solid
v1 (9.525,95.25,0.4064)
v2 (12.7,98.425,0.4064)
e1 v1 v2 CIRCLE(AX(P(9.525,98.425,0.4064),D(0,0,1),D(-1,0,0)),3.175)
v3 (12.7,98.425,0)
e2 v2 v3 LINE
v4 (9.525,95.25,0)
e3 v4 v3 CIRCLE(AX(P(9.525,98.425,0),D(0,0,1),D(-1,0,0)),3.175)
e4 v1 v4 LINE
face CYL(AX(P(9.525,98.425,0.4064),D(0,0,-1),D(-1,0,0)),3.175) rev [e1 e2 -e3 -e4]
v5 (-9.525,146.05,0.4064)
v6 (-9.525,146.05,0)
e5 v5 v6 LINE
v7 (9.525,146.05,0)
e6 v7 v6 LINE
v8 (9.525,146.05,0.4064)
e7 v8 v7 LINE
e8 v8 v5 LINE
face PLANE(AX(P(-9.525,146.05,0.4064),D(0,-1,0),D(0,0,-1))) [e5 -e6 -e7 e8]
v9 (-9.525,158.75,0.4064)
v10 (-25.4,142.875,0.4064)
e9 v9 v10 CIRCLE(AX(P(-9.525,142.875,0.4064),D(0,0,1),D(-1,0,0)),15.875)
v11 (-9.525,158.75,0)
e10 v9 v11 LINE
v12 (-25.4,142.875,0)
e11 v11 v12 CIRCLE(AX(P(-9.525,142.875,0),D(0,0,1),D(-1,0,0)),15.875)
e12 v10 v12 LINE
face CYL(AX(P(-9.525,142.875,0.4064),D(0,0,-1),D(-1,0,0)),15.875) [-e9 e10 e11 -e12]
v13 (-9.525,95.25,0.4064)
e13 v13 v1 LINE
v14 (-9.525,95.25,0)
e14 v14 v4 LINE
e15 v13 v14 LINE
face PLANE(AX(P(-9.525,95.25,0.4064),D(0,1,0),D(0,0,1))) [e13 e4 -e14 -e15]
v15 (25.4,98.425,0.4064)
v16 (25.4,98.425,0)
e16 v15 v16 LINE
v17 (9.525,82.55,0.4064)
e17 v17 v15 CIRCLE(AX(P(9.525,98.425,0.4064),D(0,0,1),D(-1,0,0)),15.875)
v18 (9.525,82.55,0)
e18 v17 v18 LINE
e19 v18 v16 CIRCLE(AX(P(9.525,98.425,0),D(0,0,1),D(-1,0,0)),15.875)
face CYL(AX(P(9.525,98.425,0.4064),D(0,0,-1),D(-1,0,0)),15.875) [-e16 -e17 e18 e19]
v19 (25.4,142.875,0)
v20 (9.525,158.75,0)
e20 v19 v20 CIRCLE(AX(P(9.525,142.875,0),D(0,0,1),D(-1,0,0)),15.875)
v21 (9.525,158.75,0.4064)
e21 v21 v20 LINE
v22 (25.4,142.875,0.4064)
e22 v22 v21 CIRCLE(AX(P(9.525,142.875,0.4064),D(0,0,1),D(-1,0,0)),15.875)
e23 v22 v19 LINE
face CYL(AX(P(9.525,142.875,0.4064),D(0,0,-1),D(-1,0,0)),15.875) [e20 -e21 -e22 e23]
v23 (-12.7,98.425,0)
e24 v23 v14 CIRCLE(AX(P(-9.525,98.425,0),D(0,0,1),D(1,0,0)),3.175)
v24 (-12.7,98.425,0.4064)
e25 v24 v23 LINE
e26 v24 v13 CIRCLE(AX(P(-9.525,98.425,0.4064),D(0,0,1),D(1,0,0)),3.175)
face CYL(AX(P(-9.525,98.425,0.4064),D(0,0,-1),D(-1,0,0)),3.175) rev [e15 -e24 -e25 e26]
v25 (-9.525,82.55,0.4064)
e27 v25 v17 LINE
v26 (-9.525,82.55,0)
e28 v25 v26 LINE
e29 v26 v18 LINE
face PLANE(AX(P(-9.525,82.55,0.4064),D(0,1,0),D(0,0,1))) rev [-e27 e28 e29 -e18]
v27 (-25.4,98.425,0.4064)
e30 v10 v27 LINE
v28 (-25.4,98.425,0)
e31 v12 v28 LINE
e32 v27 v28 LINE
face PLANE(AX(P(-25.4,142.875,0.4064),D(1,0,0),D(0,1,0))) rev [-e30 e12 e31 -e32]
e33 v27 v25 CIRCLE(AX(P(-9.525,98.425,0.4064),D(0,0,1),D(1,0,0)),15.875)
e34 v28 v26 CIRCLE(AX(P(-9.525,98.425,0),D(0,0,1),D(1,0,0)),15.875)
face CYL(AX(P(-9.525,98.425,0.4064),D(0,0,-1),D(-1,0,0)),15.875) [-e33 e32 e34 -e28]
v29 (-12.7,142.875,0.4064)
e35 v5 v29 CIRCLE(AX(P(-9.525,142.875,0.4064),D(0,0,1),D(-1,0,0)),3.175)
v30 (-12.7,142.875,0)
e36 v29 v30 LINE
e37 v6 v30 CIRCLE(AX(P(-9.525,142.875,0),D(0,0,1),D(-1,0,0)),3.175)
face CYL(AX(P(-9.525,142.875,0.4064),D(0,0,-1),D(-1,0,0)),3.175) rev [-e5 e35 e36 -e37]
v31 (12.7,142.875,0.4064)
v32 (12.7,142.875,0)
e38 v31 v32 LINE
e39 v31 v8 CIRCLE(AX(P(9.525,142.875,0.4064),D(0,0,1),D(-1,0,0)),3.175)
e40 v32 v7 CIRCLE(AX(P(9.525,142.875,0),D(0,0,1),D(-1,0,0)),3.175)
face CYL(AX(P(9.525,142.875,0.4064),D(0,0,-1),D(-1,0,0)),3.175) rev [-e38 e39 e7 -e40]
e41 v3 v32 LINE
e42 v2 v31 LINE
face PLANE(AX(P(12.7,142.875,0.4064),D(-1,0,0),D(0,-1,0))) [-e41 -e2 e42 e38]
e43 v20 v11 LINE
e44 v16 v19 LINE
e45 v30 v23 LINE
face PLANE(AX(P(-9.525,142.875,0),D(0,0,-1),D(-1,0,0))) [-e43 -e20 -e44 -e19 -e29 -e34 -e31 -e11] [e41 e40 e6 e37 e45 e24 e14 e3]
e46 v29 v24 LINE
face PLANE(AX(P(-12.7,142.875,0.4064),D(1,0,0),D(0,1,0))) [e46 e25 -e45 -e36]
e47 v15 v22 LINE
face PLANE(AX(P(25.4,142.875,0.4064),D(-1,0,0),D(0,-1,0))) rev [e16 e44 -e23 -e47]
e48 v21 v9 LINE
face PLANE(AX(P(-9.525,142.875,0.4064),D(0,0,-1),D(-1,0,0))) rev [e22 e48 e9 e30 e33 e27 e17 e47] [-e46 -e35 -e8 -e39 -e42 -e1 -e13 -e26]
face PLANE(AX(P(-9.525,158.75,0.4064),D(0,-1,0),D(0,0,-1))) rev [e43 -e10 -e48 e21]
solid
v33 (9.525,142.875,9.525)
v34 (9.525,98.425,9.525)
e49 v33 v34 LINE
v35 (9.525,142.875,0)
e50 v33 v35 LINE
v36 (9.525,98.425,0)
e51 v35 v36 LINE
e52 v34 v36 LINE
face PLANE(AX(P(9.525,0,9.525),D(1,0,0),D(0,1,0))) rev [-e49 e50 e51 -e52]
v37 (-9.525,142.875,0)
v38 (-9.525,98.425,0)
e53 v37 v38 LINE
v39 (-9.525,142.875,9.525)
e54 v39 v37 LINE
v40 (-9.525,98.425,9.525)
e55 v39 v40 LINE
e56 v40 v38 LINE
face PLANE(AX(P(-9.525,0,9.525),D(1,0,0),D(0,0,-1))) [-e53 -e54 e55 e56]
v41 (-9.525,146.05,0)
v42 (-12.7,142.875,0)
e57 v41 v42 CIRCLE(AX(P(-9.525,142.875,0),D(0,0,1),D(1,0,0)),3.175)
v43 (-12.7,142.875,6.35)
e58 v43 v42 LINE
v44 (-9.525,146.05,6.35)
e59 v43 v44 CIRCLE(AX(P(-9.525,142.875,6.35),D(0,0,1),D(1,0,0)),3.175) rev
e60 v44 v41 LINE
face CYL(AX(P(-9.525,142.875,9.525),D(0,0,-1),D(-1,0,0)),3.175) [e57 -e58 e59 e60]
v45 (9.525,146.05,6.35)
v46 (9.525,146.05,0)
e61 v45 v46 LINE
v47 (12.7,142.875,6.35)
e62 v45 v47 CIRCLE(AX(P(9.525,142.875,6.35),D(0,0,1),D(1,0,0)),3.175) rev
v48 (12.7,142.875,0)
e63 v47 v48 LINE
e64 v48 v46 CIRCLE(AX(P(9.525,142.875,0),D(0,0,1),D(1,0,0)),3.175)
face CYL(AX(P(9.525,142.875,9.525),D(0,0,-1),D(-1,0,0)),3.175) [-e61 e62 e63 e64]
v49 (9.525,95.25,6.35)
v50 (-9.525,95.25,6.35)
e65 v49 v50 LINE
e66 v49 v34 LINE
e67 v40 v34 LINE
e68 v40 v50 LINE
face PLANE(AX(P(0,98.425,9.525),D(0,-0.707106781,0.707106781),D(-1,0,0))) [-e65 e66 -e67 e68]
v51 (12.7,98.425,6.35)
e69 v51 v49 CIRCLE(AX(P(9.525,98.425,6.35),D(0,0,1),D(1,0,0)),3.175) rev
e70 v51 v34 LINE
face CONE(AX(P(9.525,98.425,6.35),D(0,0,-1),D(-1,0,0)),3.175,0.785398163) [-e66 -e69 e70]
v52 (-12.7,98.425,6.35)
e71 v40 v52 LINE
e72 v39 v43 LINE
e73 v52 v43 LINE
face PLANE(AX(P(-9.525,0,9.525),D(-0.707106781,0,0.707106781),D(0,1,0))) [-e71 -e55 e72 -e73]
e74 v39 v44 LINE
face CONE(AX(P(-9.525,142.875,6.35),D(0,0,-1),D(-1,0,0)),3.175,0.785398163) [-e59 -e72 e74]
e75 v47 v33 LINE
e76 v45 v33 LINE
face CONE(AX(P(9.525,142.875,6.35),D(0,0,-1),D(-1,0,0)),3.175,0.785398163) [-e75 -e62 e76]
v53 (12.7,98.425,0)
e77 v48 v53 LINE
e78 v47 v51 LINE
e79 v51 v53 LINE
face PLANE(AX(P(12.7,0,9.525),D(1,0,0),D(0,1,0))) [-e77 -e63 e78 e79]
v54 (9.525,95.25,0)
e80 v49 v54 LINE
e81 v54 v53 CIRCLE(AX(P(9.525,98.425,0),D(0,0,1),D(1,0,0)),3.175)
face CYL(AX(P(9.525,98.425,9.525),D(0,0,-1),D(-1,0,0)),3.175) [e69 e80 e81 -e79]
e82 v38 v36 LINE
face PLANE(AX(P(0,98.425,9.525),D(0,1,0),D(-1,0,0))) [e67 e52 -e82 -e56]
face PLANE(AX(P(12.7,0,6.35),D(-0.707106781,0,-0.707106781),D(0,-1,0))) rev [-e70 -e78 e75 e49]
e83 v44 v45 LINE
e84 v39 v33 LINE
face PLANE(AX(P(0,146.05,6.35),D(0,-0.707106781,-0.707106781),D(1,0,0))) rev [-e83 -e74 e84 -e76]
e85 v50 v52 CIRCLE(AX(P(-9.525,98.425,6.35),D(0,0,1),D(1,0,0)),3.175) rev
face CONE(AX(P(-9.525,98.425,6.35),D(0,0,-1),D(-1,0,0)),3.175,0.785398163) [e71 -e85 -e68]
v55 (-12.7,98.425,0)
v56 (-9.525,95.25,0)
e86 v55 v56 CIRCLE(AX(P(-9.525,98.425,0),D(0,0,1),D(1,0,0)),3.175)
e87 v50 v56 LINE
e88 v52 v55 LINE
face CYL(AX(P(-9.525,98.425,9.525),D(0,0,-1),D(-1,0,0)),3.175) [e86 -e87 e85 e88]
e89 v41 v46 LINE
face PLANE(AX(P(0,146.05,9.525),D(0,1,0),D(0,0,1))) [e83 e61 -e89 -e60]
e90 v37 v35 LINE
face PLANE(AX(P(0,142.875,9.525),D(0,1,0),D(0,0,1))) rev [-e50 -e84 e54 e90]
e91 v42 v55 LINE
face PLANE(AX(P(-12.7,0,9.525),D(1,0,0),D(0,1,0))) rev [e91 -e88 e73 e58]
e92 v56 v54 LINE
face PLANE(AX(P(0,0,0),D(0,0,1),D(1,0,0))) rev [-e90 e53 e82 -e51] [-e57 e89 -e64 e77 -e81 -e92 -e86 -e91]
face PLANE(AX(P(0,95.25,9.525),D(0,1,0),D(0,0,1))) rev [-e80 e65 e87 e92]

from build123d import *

# Parameters (mm, degrees)
BOSS_EXTRUDE1_DEPTH = 0.4064
SKETCH3_W           = 19.05
SKETCH3_H           = 44.45
BOSS_EXTRUDE5_DEPTH = 9.525
CHAMFER1_SIZE       = 3.175


with BuildPart() as part:
    # Sketch2 → Boss-Extrude1 (new body)
    with BuildSketch(Plane.XY):
        with BuildLine():
            Line((-9.525, 158.75), (9.525, 158.75))
            ThreePointArc((9.525, 158.75), (20.750320151, 154.100320151), (25.4, 142.875))
            Line((25.4, 142.875), (25.4, 98.425))
            ThreePointArc((25.4, 98.425), (20.750320151, 87.199679849), (9.525, 82.55))
            Line((9.525, 82.55), (-9.525, 82.55))
            ThreePointArc((-9.525, 82.55), (-20.750320151, 87.199679849), (-25.4, 98.425))
            Line((-25.4, 98.425), (-25.4, 142.875))
            ThreePointArc((-25.4, 142.875), (-20.750320151, 154.100320151), (-9.525, 158.75))
        make_face()
        with BuildLine():
            Line((-9.525, 95.25), (9.525, 95.25))
            ThreePointArc((9.525, 95.25), (11.77006403, 96.17993597), (12.7, 98.425))
            Line((12.7, 98.425), (12.7, 142.875))
            ThreePointArc((12.7, 142.875), (11.77006403, 145.12006403), (9.525, 146.05))
            Line((9.525, 146.05), (-9.525, 146.05))
            ThreePointArc((-9.525, 146.05), (-11.77006403, 145.12006403), (-12.7, 142.875))
            Line((-12.7, 142.875), (-12.7, 98.425))
            ThreePointArc((-12.7, 98.425), (-11.77006403, 96.17993597), (-9.525, 95.25))
        make_face(mode=Mode.SUBTRACT)
    extrude(amount=BOSS_EXTRUDE1_DEPTH)


with BuildPart() as body_2:
    # Sketch3 → Boss-Extrude5 (new body)
    with BuildSketch(Plane.XY):
        with BuildLine():
            Line((-9.525, 95.25), (9.525, 95.25))
            ThreePointArc((9.525, 95.25), (11.77006403, 96.17993597), (12.7, 98.425))
            Line((12.7, 98.425), (12.7, 142.875))
            ThreePointArc((12.7, 142.875), (11.77006403, 145.12006403), (9.525, 146.05))
            Line((9.525, 146.05), (-9.525, 146.05))
            ThreePointArc((-9.525, 146.05), (-11.77006403, 145.12006403), (-12.7, 142.875))
            Line((-12.7, 142.875), (-12.7, 98.425))
            ThreePointArc((-12.7, 98.425), (-11.77006403, 96.17993597), (-9.525, 95.25))
        make_face()
        with Locations((0, 120.65)):
            Rectangle(SKETCH3_W, SKETCH3_H, mode=Mode.SUBTRACT)
    extrude(amount=BOSS_EXTRUDE5_DEPTH)

    # Chamfer1
    chamfer1_edges = [body_2.edges().sort_by_distance(p)[0] for p in [
        (0, 146.05, 9.525),
        (-11.77006403, 145.12006403, 9.525),
        (-12.7, 120.65, 9.525),
        (-11.77006403, 96.17993597, 9.525),
        (0, 95.25, 9.525),
        (11.77006403, 96.17993597, 9.525),
        (12.7, 120.65, 9.525),
        (11.77006403, 145.12006403, 9.525),
    ]]
    chamfer(chamfer1_edges, length=CHAMFER1_SIZE - 0.0001)  # a hair under: the kernel refuses the full size


solid = Compound([part.part, body_2.part])
